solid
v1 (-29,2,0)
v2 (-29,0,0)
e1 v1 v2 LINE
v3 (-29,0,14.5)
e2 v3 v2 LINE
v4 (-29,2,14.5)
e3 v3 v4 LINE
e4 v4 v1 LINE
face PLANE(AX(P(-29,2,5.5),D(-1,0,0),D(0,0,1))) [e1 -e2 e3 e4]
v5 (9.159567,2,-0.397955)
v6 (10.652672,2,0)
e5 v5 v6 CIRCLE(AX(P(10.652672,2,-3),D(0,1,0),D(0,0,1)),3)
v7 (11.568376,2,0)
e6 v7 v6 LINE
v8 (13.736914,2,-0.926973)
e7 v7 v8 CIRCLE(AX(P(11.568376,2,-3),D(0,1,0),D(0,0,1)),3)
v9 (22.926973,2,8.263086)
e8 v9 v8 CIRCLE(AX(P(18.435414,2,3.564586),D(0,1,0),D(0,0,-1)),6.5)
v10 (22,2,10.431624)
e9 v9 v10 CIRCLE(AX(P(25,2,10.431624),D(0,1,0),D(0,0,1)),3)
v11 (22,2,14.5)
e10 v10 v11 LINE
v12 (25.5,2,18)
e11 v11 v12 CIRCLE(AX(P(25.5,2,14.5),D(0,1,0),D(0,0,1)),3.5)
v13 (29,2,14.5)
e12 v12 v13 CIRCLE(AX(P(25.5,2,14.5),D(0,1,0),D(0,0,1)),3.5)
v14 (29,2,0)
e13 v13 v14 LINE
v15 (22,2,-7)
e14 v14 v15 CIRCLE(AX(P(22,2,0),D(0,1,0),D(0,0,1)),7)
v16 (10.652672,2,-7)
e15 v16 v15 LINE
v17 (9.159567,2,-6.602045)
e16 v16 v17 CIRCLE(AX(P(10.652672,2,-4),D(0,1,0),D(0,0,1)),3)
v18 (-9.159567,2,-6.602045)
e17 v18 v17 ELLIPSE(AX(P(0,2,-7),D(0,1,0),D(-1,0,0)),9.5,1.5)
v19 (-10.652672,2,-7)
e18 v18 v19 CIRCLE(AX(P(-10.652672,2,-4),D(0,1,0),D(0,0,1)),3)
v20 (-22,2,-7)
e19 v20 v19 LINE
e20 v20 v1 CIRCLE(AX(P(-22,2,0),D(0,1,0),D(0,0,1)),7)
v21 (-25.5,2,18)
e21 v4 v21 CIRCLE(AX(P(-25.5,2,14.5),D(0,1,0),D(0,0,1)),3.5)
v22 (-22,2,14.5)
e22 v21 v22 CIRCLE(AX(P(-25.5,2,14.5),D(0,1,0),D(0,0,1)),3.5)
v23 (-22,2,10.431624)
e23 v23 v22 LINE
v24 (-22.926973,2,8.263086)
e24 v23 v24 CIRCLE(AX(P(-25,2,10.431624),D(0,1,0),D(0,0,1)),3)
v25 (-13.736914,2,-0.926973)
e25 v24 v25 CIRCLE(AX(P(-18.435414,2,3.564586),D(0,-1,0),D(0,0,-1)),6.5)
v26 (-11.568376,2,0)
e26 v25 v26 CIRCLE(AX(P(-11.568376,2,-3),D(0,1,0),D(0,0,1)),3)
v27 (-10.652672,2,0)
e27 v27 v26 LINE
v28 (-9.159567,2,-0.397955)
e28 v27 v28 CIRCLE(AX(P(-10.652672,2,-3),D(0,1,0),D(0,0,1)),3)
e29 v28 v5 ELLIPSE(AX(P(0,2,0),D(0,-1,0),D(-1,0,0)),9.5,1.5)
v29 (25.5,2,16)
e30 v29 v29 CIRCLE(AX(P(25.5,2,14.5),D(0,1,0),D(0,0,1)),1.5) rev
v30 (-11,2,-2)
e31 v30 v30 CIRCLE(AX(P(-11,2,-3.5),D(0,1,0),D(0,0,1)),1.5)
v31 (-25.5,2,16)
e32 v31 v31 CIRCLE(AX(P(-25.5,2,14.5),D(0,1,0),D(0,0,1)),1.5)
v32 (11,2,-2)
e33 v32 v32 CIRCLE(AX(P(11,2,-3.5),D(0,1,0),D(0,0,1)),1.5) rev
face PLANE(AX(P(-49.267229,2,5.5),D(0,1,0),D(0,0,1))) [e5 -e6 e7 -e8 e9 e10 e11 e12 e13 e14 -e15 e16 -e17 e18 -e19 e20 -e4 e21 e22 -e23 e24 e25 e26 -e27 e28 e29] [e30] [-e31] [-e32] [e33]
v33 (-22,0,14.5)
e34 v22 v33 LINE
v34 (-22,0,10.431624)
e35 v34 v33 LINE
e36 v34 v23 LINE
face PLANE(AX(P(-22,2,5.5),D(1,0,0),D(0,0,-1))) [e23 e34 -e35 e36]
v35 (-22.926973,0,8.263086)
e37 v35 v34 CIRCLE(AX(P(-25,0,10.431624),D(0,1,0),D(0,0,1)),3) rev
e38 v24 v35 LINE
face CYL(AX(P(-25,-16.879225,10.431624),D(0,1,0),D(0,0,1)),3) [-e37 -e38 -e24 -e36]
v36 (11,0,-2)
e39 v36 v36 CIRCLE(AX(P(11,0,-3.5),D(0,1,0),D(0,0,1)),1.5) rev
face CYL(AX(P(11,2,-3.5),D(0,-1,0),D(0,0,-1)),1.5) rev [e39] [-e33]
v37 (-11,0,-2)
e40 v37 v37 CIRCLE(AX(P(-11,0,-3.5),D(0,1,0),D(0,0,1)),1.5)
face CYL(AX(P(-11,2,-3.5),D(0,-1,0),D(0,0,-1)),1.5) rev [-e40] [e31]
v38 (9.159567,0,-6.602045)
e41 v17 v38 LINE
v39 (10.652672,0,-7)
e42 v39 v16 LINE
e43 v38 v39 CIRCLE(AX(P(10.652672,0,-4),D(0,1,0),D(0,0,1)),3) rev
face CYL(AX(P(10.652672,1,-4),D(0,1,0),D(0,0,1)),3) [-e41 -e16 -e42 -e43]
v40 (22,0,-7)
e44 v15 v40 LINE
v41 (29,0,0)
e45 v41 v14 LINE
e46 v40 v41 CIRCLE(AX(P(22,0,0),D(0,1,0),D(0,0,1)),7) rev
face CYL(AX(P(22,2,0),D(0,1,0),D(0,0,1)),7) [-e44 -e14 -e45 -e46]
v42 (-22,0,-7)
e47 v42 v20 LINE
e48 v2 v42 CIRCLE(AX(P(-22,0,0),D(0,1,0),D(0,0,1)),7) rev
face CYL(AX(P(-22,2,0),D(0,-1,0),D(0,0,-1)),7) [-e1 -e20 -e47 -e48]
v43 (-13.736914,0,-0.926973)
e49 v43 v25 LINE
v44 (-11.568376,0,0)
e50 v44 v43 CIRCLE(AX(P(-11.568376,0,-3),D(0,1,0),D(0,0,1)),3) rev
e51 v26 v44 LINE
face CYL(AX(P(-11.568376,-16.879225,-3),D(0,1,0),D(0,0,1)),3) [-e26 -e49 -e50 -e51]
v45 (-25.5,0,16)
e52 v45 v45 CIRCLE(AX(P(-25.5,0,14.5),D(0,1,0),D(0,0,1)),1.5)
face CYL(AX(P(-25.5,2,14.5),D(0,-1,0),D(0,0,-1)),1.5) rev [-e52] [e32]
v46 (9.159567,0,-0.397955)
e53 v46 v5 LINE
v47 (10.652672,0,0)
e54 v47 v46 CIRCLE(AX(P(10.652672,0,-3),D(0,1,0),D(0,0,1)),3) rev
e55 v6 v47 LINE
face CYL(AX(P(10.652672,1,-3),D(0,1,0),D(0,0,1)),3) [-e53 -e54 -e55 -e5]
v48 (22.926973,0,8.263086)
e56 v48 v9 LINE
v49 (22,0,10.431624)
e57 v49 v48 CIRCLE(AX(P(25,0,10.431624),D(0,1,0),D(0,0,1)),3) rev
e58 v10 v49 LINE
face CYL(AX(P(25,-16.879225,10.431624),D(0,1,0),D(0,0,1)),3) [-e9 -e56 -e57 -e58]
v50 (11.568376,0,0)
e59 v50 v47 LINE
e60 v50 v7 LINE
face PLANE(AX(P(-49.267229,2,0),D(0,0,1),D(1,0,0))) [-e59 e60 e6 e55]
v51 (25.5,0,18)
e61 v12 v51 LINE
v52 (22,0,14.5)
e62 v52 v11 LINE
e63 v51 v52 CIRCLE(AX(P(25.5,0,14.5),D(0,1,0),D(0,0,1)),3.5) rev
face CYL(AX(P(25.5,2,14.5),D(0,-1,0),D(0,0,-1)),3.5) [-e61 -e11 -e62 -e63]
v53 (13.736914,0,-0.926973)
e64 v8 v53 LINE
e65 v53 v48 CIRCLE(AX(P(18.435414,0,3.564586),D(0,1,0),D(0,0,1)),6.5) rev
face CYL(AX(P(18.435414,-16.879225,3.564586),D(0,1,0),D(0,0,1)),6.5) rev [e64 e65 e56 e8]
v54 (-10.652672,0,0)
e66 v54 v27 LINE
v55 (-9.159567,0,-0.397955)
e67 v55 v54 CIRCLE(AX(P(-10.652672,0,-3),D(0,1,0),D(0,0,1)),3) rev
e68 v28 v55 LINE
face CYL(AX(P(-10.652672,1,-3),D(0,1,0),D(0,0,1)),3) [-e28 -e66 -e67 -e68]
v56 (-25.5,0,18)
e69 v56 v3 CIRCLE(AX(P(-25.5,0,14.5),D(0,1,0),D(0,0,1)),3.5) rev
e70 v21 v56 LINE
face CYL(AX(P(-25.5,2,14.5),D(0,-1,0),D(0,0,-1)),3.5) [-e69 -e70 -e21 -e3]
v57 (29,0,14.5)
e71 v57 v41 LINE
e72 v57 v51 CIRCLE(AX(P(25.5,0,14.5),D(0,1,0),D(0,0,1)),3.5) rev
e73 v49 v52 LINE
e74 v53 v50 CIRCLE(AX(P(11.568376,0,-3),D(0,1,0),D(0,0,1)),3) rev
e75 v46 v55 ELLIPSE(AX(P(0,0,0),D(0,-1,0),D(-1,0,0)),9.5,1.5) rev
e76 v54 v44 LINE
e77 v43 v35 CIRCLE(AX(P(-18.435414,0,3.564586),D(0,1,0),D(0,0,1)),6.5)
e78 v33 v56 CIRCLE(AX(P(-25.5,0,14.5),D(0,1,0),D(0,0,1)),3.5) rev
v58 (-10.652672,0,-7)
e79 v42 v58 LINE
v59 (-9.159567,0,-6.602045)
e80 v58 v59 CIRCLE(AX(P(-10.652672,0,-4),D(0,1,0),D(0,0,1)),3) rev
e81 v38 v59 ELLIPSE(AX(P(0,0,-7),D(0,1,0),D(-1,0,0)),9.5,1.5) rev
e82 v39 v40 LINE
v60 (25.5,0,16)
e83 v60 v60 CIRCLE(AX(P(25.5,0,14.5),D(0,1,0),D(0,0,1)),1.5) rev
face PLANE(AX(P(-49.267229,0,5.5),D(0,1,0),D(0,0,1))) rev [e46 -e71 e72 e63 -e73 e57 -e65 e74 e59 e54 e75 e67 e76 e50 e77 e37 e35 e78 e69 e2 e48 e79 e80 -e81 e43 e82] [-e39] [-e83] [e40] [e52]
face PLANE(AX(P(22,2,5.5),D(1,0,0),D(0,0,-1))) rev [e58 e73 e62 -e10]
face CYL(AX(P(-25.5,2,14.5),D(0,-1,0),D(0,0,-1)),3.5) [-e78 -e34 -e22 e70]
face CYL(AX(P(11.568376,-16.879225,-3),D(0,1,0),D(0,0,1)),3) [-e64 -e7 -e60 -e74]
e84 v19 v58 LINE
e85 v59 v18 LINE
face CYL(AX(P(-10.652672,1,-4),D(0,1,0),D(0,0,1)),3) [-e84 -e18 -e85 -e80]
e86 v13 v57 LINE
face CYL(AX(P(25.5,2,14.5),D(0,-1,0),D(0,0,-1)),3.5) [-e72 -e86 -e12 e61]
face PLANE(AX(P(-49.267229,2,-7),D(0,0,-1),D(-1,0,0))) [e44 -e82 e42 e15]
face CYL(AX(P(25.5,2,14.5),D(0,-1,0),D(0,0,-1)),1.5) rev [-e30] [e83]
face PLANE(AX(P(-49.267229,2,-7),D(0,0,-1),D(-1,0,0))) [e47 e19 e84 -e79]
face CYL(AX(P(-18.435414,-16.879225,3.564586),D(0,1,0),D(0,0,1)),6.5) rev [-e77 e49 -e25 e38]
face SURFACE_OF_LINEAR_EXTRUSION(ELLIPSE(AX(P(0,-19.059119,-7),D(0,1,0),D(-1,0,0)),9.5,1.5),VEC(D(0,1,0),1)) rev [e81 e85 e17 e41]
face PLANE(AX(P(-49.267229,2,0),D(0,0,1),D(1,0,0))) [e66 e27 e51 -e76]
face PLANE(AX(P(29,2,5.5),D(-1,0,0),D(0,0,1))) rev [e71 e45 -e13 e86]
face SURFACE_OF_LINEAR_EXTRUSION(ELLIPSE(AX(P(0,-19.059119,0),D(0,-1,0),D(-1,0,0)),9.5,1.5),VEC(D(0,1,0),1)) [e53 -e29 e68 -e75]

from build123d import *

# Parameters (mm, degrees)
SKETCH1_R      = 1.5
EXTRUDE1_DEPTH = 2
FILLET1_R      = 3
FILLET2_R      = 3.5
EXTRUDE2_DEPTH = 2
EXTRUDE3_DEPTH = 2
FILLET3_R      = 3
FILLET5_R      = 7


with BuildPart() as part:
    # Sketch1 → Extrude1 (new body)
    # profile 1 of 2: a face of its own
    with BuildSketch(Plane(origin=(0, 0, 0), x_dir=(1, 0, 0), z_dir=(0, 1, 0))):
        Polygon((-22, 0), (0, 0), (0, 7), (-29, 7), (-29, -18), (-22, -18), align=None)
        with Locations(Location((-25.5, -14.5, 0), (0, 0, 270))):
            Circle(SKETCH1_R, mode=Mode.SUBTRACT)
        with Locations(Location((-11, 3.5, 0), (0, 0, 270))):
            Circle(SKETCH1_R, mode=Mode.SUBTRACT)
    # profile 2 of 2: a face of its own
    with BuildSketch(Plane(origin=(0, 0, 0), x_dir=(1, 0, 0), z_dir=(0, 1, 0))):
        Polygon((0, 0), (22, 0), (22, -18), (29, -18), (29, 7), (0, 7), align=None)
        with Locations(Location((25.5, -14.5, 0), (0, 0, 270))):
            Circle(SKETCH1_R, mode=Mode.SUBTRACT)
        with Locations(Location((11, 3.5, 0), (0, 0, 270))):
            Circle(SKETCH1_R, mode=Mode.SUBTRACT)
    extrude(amount=EXTRUDE1_DEPTH)

    # Fillet1
    fillet1_edges = [part.edges().sort_by_distance(p)[0] for p in [
        (-22, 1, 0),
        (22, 1, 0),
    ]]
    fillet(fillet1_edges, radius=FILLET1_R)

    # Fillet2
    fillet2_edges = [part.edges().sort_by_distance(p)[0] for p in [
        (29, 1, 18),
        (22, 1, 18),
        (-22, 1, 18),
        (-29, 1, 18),
    ]]
    fillet(fillet2_edges, radius=FILLET2_R - 0.0001)  # a hair under: the kernel refuses the full size

    # Sketch2 → Extrude2 (cut)
    with BuildSketch(Plane(origin=(0, 2, 0), x_dir=(1, 0, 0), z_dir=(0, 1, 0))):
        with BuildLine():
            Line((-9.5, 7), (9.5, 7))
            add(Edge.make_bspline(
                [(-9.5, 7), (-9.5, 5.5), (0, 5.5), (9.5, 5.5), (9.5, 7)],
                knots=[0, 0, 0, 1.570796327, 1.570796327, 3.141592654, 3.141592654, 3.141592654], degree=2, weights=[1, 0.707106781, 1, 0.707106781, 1]))
        make_face()
    extrude2 = extrude(amount=-EXTRUDE2_DEPTH, mode=Mode.SUBTRACT)

    # Mirror1: Extrude2 across plane
    add(extrude2.mirror(Plane(origin=(0, 0, -3.5), x_dir=(1, 0, 0), z_dir=(0, 0, -1))), mode=Mode.SUBTRACT)

    # Sketch3 → Extrude3 (cut)
    with BuildSketch(Plane(origin=(0, 2, 0), x_dir=(-1, 0, 0), z_dir=(0, 1, 0))):
        with BuildLine():
            Line((-13, 0), (-19, 0))
            ThreePointArc((-19, 0), (-21.121320344, 0.878679656), (-22, 3))
            Line((-22, 3), (-22, 9))
            ThreePointArc((-22, 9), (-23.031608424, -1.031608424), (-13, 0))
        make_face()
    extrude3 = extrude(amount=-EXTRUDE3_DEPTH, mode=Mode.SUBTRACT)

    # Mirror4: Extrude3 across plane
    add(extrude3.mirror(Plane(origin=(0, 0, 0), x_dir=(0, 0, 1), z_dir=(1, 0, 0))), mode=Mode.SUBTRACT)

    # Fillet3
    fillet3_edges = [part.edges().sort_by_distance(p)[0] for p in [
        (9.5, 1, 0),
        (-9.5, 1, 0),
        (22, 1, 9),
        (13, 1, 0),
        (-9.5, 1, -7),
        (9.5, 1, -7),
        (-22, 1, 9),
        (-13, 1, 0),
    ]]
    fillet(fillet3_edges, radius=FILLET3_R)

    # Fillet5
    fillet5_edges = [part.edges().sort_by_distance(p)[0] for p in [
        (-29, 1, -7),
        (29, 1, -7),
    ]]
    fillet(fillet5_edges, radius=FILLET5_R)


solid = part.part
